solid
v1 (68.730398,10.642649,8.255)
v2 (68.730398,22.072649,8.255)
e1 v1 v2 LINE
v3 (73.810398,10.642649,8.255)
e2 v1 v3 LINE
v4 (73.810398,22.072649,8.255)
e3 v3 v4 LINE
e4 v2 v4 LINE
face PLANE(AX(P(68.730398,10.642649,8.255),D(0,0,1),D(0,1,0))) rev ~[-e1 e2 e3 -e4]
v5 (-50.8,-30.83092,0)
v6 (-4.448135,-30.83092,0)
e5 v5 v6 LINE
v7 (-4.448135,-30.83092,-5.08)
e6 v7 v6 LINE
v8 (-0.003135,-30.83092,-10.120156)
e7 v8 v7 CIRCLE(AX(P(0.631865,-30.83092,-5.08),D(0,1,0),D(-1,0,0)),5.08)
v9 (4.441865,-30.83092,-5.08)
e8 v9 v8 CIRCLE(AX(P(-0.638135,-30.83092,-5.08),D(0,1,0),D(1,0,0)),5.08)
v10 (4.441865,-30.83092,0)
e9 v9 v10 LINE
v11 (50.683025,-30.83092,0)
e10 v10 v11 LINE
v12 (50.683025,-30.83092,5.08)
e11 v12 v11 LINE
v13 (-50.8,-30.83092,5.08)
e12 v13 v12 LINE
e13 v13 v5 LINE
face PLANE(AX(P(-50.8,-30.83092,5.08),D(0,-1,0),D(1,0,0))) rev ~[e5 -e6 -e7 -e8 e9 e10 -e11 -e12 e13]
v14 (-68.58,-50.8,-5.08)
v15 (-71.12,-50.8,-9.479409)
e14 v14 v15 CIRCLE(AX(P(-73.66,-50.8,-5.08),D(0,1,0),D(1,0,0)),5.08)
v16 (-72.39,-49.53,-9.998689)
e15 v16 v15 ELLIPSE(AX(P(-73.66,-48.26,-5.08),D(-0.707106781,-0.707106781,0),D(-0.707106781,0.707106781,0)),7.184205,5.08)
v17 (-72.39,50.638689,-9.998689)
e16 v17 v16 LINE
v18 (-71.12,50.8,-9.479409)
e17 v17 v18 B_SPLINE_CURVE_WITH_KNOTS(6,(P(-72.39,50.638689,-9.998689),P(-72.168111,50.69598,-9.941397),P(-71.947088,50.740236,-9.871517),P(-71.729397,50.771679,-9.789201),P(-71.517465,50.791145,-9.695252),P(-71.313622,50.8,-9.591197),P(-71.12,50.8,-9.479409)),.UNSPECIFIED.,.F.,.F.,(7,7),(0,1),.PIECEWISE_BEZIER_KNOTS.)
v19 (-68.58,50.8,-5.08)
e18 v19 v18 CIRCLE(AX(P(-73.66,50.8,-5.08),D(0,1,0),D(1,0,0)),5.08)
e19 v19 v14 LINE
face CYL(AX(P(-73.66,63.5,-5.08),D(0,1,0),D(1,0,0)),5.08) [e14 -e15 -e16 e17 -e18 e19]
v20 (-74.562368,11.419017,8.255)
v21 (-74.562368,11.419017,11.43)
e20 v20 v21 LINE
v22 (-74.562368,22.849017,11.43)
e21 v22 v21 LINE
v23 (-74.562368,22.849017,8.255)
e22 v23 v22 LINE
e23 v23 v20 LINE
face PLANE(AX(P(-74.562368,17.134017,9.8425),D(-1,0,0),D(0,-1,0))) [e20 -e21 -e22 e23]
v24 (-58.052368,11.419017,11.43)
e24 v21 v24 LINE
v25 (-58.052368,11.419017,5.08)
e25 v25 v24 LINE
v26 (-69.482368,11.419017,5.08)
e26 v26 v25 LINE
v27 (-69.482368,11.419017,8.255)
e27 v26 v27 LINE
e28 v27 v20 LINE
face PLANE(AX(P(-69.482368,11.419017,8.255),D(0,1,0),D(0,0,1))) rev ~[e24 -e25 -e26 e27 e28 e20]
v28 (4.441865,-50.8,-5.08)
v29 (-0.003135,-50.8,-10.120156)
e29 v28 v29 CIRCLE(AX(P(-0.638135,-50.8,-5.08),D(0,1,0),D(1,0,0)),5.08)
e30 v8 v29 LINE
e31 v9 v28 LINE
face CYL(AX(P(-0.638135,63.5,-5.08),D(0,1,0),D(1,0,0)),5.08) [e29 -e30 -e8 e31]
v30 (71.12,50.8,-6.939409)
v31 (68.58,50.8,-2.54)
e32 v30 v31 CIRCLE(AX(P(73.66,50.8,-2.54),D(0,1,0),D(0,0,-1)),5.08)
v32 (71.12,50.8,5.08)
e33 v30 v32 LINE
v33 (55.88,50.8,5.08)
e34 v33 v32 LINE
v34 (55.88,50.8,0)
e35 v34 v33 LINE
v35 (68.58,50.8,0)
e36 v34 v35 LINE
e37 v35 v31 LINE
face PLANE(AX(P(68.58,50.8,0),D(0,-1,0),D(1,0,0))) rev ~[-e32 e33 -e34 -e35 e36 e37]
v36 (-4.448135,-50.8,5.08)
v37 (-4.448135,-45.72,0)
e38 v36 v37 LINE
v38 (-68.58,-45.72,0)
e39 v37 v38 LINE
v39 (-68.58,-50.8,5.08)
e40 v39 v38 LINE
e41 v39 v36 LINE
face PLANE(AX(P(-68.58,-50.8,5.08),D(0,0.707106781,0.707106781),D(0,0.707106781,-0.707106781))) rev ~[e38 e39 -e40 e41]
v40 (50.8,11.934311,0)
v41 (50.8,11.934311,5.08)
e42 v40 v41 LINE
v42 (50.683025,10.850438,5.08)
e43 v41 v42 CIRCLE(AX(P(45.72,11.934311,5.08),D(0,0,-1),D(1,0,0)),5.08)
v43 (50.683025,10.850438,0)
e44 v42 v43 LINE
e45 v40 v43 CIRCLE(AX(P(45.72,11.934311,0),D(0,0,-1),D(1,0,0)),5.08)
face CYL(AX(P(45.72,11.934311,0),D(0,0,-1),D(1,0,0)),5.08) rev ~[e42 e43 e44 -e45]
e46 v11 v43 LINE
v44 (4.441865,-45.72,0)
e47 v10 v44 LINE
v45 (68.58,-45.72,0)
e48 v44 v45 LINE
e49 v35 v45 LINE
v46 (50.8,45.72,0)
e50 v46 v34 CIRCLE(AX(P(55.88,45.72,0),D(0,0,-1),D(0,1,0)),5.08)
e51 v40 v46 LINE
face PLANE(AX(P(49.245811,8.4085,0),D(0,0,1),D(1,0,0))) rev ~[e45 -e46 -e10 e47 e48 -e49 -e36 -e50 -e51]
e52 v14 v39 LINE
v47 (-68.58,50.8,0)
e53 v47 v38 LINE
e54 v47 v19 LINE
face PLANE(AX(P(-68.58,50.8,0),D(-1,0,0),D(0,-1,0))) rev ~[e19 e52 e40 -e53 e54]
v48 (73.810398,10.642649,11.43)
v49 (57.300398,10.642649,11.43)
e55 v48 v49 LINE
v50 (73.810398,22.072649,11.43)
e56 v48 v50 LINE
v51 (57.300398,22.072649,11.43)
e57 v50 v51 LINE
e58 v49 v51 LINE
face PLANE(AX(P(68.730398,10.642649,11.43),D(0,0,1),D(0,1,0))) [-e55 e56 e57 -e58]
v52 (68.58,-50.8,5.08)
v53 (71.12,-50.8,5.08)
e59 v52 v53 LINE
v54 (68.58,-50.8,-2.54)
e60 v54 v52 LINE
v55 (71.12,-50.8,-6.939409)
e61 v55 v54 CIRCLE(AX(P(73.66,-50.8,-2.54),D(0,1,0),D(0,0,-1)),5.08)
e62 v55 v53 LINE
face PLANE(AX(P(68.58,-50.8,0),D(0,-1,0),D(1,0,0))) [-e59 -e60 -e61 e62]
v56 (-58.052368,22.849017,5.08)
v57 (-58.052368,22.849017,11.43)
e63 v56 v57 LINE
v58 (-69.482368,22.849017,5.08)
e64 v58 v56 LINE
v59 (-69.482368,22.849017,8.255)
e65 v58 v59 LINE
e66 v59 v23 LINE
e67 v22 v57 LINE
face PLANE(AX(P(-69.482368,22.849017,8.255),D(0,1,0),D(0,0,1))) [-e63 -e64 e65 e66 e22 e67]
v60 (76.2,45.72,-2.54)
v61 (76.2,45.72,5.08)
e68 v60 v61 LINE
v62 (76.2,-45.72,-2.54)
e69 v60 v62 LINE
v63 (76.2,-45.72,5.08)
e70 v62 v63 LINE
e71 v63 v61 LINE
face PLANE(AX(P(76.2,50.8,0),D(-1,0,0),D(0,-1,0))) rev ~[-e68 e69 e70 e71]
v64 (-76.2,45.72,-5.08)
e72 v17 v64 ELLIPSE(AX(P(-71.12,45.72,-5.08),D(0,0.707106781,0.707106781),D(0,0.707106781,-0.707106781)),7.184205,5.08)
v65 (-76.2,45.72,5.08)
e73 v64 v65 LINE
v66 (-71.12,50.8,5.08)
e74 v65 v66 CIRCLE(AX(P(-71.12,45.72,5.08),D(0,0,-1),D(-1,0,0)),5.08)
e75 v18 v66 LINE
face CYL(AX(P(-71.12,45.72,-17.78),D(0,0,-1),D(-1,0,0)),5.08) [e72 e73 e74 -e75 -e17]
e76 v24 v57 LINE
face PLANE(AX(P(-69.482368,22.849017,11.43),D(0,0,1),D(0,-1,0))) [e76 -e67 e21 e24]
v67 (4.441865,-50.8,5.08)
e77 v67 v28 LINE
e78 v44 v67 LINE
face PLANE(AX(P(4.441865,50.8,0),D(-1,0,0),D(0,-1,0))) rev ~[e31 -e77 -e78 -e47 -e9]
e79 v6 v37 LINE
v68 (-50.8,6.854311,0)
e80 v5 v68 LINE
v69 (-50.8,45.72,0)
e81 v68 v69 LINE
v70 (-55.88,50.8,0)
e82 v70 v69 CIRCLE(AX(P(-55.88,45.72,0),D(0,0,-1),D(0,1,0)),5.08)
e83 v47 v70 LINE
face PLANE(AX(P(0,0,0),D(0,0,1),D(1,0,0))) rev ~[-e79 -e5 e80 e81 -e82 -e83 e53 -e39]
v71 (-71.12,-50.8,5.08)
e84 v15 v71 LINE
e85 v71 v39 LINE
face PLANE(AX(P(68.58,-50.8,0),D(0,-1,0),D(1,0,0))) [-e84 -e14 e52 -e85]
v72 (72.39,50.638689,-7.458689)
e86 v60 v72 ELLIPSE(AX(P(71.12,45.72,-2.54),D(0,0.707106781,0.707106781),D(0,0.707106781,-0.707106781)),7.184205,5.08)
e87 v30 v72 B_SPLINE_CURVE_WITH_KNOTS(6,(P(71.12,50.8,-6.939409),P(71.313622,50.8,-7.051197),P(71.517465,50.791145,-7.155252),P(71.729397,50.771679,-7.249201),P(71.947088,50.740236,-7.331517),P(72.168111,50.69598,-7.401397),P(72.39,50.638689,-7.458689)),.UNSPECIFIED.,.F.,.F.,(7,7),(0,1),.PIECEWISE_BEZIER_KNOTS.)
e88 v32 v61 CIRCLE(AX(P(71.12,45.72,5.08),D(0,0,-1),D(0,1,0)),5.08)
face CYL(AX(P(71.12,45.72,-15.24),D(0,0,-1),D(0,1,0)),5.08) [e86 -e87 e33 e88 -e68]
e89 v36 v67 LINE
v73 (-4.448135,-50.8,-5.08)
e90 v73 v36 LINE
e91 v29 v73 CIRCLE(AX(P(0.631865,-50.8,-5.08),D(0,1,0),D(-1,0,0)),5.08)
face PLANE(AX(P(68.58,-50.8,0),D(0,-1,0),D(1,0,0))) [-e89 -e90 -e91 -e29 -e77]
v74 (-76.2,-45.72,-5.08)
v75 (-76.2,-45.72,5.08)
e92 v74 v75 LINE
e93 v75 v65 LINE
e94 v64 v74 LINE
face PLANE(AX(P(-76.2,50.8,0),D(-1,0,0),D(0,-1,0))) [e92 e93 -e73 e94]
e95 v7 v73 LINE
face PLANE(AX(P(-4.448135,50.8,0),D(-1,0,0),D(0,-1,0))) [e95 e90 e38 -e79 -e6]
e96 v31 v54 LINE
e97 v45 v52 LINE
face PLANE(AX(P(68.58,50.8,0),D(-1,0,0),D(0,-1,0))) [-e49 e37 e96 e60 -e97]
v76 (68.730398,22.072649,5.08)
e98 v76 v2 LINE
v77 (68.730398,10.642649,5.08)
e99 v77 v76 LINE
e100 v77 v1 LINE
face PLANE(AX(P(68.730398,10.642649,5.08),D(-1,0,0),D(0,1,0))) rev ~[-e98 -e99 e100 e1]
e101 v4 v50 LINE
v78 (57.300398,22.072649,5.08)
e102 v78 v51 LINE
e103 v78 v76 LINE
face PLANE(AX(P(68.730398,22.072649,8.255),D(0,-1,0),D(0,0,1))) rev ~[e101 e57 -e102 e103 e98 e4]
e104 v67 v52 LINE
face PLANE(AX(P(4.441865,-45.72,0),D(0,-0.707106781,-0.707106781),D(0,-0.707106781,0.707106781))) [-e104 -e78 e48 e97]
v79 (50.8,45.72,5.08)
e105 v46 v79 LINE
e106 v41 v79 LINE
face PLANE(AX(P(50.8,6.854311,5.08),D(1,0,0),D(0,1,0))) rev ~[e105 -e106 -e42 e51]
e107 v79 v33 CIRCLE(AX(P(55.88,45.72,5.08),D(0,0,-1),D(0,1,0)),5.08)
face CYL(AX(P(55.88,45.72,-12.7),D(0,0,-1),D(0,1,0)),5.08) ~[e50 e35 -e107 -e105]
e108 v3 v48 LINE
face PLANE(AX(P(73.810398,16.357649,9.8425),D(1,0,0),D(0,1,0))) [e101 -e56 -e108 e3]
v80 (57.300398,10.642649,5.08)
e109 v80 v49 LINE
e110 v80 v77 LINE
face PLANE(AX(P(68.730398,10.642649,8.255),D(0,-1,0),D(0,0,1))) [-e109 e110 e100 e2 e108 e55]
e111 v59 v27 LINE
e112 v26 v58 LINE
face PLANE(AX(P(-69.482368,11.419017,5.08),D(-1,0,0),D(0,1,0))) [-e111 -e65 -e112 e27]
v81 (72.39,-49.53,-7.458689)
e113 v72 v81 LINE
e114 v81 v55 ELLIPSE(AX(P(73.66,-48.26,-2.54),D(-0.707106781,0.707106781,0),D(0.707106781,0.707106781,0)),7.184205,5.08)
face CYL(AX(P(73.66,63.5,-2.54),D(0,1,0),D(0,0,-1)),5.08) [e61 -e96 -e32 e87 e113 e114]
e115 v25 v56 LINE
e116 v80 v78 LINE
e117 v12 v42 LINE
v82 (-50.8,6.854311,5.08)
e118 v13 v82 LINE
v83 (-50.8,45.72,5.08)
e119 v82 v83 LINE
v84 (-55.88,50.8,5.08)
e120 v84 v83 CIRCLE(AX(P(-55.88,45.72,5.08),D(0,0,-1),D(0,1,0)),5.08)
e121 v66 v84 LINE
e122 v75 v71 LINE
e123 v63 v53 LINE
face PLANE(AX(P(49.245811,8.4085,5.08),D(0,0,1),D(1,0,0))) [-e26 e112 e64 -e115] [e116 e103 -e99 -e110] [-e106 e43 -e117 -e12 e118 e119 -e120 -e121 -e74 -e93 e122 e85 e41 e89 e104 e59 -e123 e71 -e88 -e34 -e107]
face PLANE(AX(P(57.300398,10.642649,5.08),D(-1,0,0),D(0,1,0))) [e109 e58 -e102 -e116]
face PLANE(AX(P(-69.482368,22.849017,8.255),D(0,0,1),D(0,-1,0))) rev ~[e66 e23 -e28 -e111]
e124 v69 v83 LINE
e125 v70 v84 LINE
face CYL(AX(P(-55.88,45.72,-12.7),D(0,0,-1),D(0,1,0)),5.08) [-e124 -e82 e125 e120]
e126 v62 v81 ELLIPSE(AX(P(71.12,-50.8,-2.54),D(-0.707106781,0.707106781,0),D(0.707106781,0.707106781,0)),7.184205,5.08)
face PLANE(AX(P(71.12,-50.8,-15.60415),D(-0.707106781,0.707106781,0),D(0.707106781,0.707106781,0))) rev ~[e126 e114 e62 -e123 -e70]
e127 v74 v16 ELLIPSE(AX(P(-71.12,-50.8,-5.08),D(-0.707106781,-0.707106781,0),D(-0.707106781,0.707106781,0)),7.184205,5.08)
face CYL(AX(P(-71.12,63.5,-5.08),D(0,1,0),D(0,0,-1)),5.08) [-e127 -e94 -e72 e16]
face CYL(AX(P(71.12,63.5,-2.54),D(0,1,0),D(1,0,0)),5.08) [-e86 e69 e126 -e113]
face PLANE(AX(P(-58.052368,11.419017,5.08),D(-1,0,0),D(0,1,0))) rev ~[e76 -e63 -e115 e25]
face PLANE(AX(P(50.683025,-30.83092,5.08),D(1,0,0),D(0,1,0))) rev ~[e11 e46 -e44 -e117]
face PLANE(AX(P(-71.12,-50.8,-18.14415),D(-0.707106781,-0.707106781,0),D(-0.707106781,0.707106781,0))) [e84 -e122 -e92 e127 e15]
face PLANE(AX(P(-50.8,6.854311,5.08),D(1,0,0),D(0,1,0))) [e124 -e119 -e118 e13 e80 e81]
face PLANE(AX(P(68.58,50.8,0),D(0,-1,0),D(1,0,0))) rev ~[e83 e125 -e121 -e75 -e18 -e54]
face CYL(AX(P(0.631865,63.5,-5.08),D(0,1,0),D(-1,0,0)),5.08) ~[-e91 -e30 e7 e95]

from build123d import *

# Parameters (mm, degrees)
F0_W          = 152.4
F0_H          = 101.6
F1_DEPTH      = 5.08
F2_W          = 7.62
F2_H          = 101.6
F3_DEPTH      = 10.16
F4_T1_DEPTH   = 127
F5_W          = 7.62
F5_H          = 101.6
F6_DEPTH      = 7.62
F7_T1_DEPTH   = 127
F8_W          = 8.89
F8_H          = 101.6
F9_DEPTH      = 10.16
F10_T1_DEPTH  = 127
F11_W         = 101.6
F11_H         = 43.9456890713
F12_DEPTH     = 25.4
F13_T1_DEPTH  = 5.08
F13_T3_DEPTH  = 30.48
F13_T5_DEPTH  = 35.56
F13_T7_DEPTH  = 33.02
F14_T1_DEPTH  = 36.2882991577
F14_T3_DEPTH  = 33.7482991577
F14_T5_DEPTH  = 64.1381350342
F14_T7_DEPTH  = 64.1318649658
F14_T12_DEPTH = 90.2664341919
F14_T17_DEPTH = 90.2601641236
F15_W         = 11.43
F15_H         = 11.43
F16_DEPTH     = 6.35
F17_W         = 11.43
F17_H         = 11.43
F18_DEPTH     = 6.35
F19_W         = 11.43
F19_H         = 3.175
F20_DEPTH     = 5.08
F21_W         = 11.43
F21_H         = 3.175
F22_DEPTH     = 5.08
F23_W         = 101.4830252707
F23_H         = 42.7652306713
F24_DEPTH     = 25.4


# Not quite as in the source:
# - a fillet or chamfer that OpenCascade refuses, or shapes differently, is made with other operations: its cross-section is extruded or revolved along the edge and cut away or added


with BuildPart() as f1:
    # F0 (on Top) → F1 (new body)
    with BuildSketch(Plane.XY):
        Rectangle(F0_W, F0_H)
    extrude(amount=F1_DEPTH)

    # F2 (on face) → F3 (join)
    with BuildSketch(Plane(origin=(0, 0, 0), x_dir=(1, 0, 0), z_dir=(0, 0, -1))):
        with Locations((-72.39, 0)):
            Rectangle(F2_W, F2_H)
    extrude(amount=F3_DEPTH)

    # F4: fillet of radius 5.08 on 2 edges, made by hand

    # F4_s2 → F4_t1 (cut)
    with BuildSketch(Plane.XZ.offset(-63.5)):
        with BuildLine():
            ThreePointArc((-71.12, -10.16), (-74.7121024484, -8.6721024484), (-76.2, -5.08))
            Line((-76.2, -5.08), (-76.2, -10.16))
            Line((-76.2, -10.16), (-71.12, -10.16))
        make_face()
        with BuildLine():
            ThreePointArc((-68.58, -5.08), (-70.0678975516, -8.6721024484), (-73.66, -10.16))
            Line((-73.66, -10.16), (-68.58, -10.16))
            Line((-68.58, -10.16), (-68.58, -5.08))
        make_face()
    extrude(amount=F4_T1_DEPTH, mode=Mode.SUBTRACT)

    # F5 (on face) → F6 (join)
    with BuildSketch(Plane(origin=(0, 0, 0), x_dir=(1, 0, 0), z_dir=(0, 0, -1))):
        with Locations((72.39, 0)):
            Rectangle(F5_W, F5_H)
    extrude(amount=F6_DEPTH)

    # F7: fillet of radius 5.08 on 2 edges, made by hand

    # F7_s2 → F7_t1 (cut)
    with BuildSketch(Plane.XZ.offset(-63.5)):
        with BuildLine():
            ThreePointArc((76.2, -2.54), (74.7121024484, -6.1321024484), (71.12, -7.62))
            Line((71.12, -7.62), (76.2, -7.62))
            Line((76.2, -7.62), (76.2, -2.54))
        make_face()
        with BuildLine():
            ThreePointArc((73.66, -7.62), (70.0678975516, -6.1321024484), (68.58, -2.54))
            Line((68.58, -2.54), (68.58, -7.62))
            Line((68.58, -7.62), (73.66, -7.62))
        make_face()
    extrude(amount=F7_T1_DEPTH, mode=Mode.SUBTRACT)

    # F8 (on face) → F9 (join)
    with BuildSketch(Plane(origin=(0, 0, 0), x_dir=(1, 0, 0), z_dir=(0, 0, -1))):
        with Locations((-0.0031350342, 0)):
            Rectangle(F8_W, F8_H)
    extrude(amount=F9_DEPTH)

    # F10: fillet of radius 5.08 on 2 edges, made by hand

    # F10_s2 → F10_t1 (cut)
    with BuildSketch(Plane.XZ.offset(-63.5)):
        with BuildLine():
            ThreePointArc((-4.4481350342, -5.08), (-2.9602374826, -8.6721024484), (0.6318649658, -10.16))
            Line((0.6318649658, -10.16), (-4.4481350342, -10.16))
            Line((-4.4481350342, -10.16), (-4.4481350342, -5.08))
        make_face()
        with BuildLine():
            ThreePointArc((4.4418649658, -5.08), (2.9539674142, -8.6721024484), (-0.6381350342, -10.16))
            Line((-0.6381350342, -10.16), (4.4418649658, -10.16))
            Line((4.4418649658, -10.16), (4.4418649658, -5.08))
        make_face()
    extrude(amount=F10_T1_DEPTH, mode=Mode.SUBTRACT)

    # F11 (on face) → F12 (cut)
    with BuildSketch(Plane.XY.offset(5.08)):
        with Locations((0, 28.8271554643)):
            Rectangle(F11_W, F11_H)
    extrude(amount=-F12_DEPTH, mode=Mode.SUBTRACT)

    # F13: fillet of radius 5.08 on 5 edges, made by hand

    # F13_s2 → F13_t1 (join)
    with BuildSketch(Plane.XY):
        with BuildLine():
            ThreePointArc((50.8, 11.9343109287), (49.3121024484, 8.3422084803), (45.72, 6.8543109287))
            Line((45.72, 6.8543109287), (50.8, 6.8543109287))
            Line((50.8, 6.8543109287), (50.8, 11.9343109287))
        make_face()
    extrude(amount=F13_T1_DEPTH)

    # F13_s4 → F13_t3 (cut)
    with BuildSketch(Plane.XY.offset(-12.7)):
        with BuildLine():
            ThreePointArc((-55.88, 50.8), (-52.2878975516, 49.3121024484), (-50.8, 45.72))
            Line((-50.8, 45.72), (-50.8, 50.8))
            Line((-50.8, 50.8), (-55.88, 50.8))
        make_face()
        with BuildLine():
            ThreePointArc((55.88, 50.8), (52.2878975516, 49.3121024484), (50.8, 45.72))
            Line((50.8, 45.72), (50.8, 50.8))
            Line((50.8, 50.8), (55.88, 50.8))
        make_face()
    extrude(amount=F13_T3_DEPTH, mode=Mode.SUBTRACT)

    # F13_s6 → F13_t5 (cut)
    with BuildSketch(Plane.XY.offset(-17.78)):
        with BuildLine():
            ThreePointArc((-76.2, 45.72), (-74.7121024484, 49.3121024484), (-71.12, 50.8))
            Line((-71.12, 50.8), (-76.2, 50.8))
            Line((-76.2, 50.8), (-76.2, 45.72))
        make_face()
    extrude(amount=F13_T5_DEPTH, mode=Mode.SUBTRACT)

    # F13_s8 → F13_t7 (cut)
    with BuildSketch(Plane.XY.offset(-15.24)):
        with BuildLine():
            ThreePointArc((71.12, 50.8), (74.7121024484, 49.3121024484), (76.2, 45.72))
            Line((76.2, 45.72), (76.2, 50.8))
            Line((76.2, 50.8), (71.12, 50.8))
        make_face()
    extrude(amount=F13_T7_DEPTH, mode=Mode.SUBTRACT)

    # F14: chamfer of 5.08 on 4 edges, made by hand

    # F14_s2 → F14_t1 (cut)
    with BuildSketch(Plane.XY.offset(-18.1441495789)):
        Polygon((-71.12, -50.8), (-76.2, -45.72), (-76.2, -50.8), align=None)
    extrude(amount=F14_T1_DEPTH, mode=Mode.SUBTRACT)

    # F14_s4 → F14_t3 (cut)
    with BuildSketch(Plane.XY.offset(-15.6041495789)):
        Polygon((71.12, -50.8), (76.2, -45.72), (76.2, -50.8), align=None)
    extrude(amount=F14_T3_DEPTH, mode=Mode.SUBTRACT)

    # F14_s6 → F14_t5 (cut)
    with BuildSketch(Plane.YZ.offset(4.4418649658)):
        Polygon((-45.72, 0), (-50.8, 5.08), (-50.8, 0), align=None)
    extrude(amount=F14_T5_DEPTH, mode=Mode.SUBTRACT)

    # F14_s8 → F14_t7 (cut)
    with BuildSketch(Plane.YZ.offset(-68.58)):
        Polygon((-50.8, 5.08), (-45.72, 0), (-50.8, 0), align=None)
    extrude(amount=F14_T7_DEPTH, mode=Mode.SUBTRACT)


with BuildPart() as f14_tool10:
    # F14_s11 → F14_t12 (new body)
    with BuildSketch(Plane.YZ.offset(-8.622284613)):
        Polygon((-45.72, 0), (-50.8, 5.08), (-50.8, 0), align=None)
    extrude(amount=F14_T12_DEPTH)

    split(bisect_by=Plane.YZ.offset(-4.4481350342), keep=Keep.BOTTOM)


with BuildPart() as f1_1:
    add(f1.part)

    # F14_t9: cut F14_tool10
    add(f14_tool10.part, mode=Mode.SUBTRACT)


with BuildPart() as f14_tool15:
    # F14_s16 → F14_t17 (new body)
    with BuildSketch(Plane.YZ.offset(-81.6441495789)):
        Polygon((-50.8, 5.08), (-45.72, 0), (-50.8, 0), align=None)
    extrude(amount=F14_T17_DEPTH)

    split(bisect_by=Plane.YZ.offset(4.4418649658), keep=Keep.TOP)


with BuildPart() as f1_2:
    add(f1_1.part)

    # F14_t14: cut F14_tool15
    add(f14_tool15.part, mode=Mode.SUBTRACT)

    # F15 (on face) → F16 (join)
    with BuildSketch(Plane.XY.offset(5.08)):
        with Locations((63.0153976381, 16.3576488795)):
            Rectangle(F15_W, F15_H)
    extrude(amount=F16_DEPTH)

    # F17 (on face) → F18 (join)
    with BuildSketch(Plane.XY.offset(5.08)):
        with Locations((-63.7673679739, 17.1340169625)):
            Rectangle(F17_W, F17_H)
    extrude(amount=F18_DEPTH)

    # F19 (on face) → F20 (join)
    with BuildSketch(Plane(origin=(-69.4823679739, 0, 0), x_dir=(0, -1, 0), z_dir=(-1, 0, 0))):
        with Locations((-17.1340169625, 9.8425)):
            Rectangle(F19_W, F19_H)
    extrude(amount=F20_DEPTH)

    # F21 (on face) → F22 (join)
    with BuildSketch(Plane.YZ.offset(68.7303976381)):
        with Locations((16.3576488795, 9.8425)):
            Rectangle(F21_W, F21_H)
    extrude(amount=F22_DEPTH)

    # F23 (on face) → F24 (cut)
    with BuildSketch(Plane.XY.offset(5.08)):
        with Locations((-0.0584873646, -9.448304407)):
            Rectangle(F23_W, F23_H)
    extrude(amount=-F24_DEPTH, mode=Mode.SUBTRACT)


solid = f1_2.part
